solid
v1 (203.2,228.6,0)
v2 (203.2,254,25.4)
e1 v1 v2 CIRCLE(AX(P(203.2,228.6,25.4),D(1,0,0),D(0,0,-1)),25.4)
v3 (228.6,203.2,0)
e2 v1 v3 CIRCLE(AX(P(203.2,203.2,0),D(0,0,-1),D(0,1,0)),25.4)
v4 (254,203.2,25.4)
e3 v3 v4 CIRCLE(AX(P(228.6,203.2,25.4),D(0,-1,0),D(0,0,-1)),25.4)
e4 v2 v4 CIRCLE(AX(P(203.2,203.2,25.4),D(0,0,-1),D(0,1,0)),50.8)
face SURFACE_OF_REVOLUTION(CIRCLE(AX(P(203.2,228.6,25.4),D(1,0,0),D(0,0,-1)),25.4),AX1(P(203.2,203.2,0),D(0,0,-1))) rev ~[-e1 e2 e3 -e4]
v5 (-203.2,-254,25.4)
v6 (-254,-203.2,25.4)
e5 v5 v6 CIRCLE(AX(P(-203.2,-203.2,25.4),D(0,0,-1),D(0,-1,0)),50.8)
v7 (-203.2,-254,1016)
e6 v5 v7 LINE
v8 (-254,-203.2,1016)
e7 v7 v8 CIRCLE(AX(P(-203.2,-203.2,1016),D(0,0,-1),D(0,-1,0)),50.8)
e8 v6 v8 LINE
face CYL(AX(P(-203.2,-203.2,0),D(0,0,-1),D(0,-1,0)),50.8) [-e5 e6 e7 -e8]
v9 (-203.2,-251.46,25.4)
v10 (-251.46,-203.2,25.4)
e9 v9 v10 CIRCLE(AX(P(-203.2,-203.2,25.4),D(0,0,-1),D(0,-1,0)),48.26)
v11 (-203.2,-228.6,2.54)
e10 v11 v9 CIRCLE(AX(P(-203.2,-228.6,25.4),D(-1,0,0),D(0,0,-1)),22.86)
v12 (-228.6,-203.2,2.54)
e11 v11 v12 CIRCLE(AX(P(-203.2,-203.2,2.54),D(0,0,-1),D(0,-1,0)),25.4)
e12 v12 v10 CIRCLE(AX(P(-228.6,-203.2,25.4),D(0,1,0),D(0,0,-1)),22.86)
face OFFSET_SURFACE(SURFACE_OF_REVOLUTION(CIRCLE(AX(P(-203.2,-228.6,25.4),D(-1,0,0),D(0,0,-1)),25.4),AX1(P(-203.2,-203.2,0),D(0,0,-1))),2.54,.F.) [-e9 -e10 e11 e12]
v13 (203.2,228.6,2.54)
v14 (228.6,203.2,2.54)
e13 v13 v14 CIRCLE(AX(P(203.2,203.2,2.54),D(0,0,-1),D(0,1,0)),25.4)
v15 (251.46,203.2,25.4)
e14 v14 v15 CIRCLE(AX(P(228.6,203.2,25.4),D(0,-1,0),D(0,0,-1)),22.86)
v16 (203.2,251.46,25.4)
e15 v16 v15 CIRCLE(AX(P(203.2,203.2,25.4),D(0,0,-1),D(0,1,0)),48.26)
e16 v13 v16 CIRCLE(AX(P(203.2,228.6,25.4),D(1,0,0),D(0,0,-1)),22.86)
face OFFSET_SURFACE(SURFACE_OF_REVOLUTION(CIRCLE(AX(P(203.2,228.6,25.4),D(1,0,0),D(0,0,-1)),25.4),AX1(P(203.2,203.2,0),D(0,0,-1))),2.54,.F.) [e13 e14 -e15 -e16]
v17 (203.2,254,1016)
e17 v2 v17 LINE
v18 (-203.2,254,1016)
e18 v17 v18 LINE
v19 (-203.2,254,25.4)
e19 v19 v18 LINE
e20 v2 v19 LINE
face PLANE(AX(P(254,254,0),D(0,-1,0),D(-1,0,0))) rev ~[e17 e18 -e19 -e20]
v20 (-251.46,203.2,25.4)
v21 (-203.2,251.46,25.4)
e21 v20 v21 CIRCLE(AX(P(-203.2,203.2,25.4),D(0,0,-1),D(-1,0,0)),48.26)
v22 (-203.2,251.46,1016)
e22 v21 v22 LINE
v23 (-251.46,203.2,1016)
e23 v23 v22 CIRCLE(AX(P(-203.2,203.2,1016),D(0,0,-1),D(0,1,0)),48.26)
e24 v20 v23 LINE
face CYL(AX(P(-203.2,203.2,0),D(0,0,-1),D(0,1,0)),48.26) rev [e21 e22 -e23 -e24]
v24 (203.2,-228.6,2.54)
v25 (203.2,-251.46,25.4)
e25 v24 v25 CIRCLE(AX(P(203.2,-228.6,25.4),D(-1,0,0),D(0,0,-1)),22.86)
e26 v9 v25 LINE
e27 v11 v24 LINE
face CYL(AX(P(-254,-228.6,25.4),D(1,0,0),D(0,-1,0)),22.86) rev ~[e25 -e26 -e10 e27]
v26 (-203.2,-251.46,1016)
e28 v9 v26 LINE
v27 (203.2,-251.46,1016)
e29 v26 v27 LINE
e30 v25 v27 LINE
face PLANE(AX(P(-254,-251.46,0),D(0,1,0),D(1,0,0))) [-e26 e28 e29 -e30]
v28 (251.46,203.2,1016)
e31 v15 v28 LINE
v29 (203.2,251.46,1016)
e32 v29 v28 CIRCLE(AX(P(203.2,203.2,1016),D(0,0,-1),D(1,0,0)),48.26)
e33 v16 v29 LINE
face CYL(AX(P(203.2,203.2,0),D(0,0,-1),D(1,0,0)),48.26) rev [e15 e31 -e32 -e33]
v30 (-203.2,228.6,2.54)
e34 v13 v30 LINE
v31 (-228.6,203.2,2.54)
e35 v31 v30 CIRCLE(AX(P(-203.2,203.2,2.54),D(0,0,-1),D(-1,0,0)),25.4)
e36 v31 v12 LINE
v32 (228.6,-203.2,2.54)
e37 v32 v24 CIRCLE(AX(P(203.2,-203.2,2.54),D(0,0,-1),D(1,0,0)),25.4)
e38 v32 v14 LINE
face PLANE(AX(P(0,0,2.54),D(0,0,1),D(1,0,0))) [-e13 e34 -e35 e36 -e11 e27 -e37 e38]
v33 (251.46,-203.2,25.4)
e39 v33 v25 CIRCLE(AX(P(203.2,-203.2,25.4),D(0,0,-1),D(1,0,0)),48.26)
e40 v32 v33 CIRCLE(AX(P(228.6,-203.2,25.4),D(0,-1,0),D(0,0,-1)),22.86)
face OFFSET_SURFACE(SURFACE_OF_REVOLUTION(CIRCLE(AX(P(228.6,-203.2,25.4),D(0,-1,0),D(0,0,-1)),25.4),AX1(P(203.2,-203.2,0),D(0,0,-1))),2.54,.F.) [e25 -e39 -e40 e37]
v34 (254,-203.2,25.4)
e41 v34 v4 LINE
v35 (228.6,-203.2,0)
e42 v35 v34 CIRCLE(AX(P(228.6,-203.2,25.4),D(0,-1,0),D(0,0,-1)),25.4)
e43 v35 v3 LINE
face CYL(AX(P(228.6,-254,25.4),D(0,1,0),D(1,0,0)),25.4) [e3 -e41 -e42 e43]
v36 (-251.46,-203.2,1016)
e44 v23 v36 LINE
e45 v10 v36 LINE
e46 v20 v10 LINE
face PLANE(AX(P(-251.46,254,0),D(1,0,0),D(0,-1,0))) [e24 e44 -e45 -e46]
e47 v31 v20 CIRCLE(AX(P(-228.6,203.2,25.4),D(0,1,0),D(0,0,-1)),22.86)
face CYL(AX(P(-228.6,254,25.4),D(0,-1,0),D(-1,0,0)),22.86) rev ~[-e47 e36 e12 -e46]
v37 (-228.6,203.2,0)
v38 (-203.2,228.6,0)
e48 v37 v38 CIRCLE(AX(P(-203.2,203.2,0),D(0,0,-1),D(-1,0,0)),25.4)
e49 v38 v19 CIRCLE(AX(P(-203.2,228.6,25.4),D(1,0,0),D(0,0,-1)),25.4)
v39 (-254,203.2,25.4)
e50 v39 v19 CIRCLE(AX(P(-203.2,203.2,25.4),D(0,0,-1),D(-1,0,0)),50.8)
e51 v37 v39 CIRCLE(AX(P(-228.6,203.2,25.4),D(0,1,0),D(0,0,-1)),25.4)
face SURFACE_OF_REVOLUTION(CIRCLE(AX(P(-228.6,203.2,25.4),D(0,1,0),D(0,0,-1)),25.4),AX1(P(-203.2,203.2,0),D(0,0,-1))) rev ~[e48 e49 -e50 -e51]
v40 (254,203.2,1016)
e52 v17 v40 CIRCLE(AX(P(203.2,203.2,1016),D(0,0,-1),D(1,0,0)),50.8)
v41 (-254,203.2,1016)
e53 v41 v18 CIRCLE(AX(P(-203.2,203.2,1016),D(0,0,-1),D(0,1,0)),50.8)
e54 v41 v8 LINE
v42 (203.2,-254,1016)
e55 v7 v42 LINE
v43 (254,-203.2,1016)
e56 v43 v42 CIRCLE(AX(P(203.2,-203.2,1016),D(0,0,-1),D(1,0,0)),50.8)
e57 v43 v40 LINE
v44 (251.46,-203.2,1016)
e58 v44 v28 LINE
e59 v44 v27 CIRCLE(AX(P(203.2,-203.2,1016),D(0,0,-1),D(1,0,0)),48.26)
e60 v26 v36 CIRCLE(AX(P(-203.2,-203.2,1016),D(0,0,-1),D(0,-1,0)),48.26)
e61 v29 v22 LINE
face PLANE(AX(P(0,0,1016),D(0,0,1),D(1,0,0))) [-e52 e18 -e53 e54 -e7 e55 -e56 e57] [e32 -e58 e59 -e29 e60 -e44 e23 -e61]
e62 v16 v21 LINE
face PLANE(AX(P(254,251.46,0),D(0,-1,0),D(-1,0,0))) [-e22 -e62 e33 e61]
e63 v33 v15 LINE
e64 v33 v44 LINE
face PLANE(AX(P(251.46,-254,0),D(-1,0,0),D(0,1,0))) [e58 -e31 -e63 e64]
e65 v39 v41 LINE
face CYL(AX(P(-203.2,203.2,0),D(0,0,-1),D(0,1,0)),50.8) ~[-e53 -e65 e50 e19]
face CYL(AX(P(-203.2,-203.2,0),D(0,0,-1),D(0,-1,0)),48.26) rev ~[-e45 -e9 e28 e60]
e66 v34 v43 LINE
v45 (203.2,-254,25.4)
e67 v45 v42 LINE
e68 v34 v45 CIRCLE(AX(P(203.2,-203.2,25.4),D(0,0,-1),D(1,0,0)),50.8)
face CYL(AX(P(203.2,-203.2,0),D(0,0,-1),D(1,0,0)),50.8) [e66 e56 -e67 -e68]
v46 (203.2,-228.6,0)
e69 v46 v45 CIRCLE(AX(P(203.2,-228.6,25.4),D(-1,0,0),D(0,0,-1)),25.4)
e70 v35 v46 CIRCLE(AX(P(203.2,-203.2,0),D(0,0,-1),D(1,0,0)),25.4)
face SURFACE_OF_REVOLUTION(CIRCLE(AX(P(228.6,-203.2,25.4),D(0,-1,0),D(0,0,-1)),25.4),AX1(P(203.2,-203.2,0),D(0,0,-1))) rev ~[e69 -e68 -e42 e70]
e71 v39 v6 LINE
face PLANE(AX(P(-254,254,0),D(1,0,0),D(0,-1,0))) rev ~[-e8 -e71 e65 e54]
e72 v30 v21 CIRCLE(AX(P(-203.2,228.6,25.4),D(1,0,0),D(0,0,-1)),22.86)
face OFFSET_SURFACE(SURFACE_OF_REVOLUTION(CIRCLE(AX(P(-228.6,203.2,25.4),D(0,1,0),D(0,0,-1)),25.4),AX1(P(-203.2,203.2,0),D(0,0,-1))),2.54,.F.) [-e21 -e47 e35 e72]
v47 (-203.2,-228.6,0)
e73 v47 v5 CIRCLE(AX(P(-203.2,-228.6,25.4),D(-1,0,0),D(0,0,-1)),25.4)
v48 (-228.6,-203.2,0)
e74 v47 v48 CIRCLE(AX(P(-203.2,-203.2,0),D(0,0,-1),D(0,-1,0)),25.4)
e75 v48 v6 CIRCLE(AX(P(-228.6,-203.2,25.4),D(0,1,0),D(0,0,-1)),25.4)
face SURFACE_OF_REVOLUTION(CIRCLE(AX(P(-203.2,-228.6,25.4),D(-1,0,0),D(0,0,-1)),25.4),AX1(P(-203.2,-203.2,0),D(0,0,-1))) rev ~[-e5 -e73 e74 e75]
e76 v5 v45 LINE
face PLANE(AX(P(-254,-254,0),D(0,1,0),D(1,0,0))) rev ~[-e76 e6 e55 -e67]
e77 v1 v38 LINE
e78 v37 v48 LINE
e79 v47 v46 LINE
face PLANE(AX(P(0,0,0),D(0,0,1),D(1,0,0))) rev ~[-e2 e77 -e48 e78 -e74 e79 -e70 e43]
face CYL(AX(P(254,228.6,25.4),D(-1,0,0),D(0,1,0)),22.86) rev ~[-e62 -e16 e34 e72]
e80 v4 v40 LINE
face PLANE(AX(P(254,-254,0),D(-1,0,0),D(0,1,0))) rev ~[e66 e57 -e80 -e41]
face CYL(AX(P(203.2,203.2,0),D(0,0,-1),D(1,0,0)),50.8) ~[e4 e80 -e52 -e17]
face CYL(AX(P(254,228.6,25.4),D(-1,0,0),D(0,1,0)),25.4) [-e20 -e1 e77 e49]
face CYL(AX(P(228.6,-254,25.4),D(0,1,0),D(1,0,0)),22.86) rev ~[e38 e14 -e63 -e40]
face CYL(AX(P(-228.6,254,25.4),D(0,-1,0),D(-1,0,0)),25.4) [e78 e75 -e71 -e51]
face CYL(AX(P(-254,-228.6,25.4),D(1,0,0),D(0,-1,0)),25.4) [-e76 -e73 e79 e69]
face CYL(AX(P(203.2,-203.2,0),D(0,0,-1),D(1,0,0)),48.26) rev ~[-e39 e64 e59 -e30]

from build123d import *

# Parameters (mm, degrees)
F1_DEPTH     = 1016
F2_R         = 25.4
F3_T1_DEPTH  = 1143
F3_T4_ANGLE  = 90
F3_T6_ANGLE  = 90
F3_T8_ANGLE  = 90
F3_T10_ANGLE = 90
F4_T         = -2.54


# Not quite as in the source:
# - a fillet or chamfer that OpenCascade refuses, or shapes differently, is made with other operations: its cross-section is extruded or revolved along the edge and cut away or added


with BuildPart() as f1:
    # F0 (on Top) → F1 (new body)
    with BuildSketch(Plane.XY):
        Polygon((254, -254), (254, 0), (254, 254), (-254, 254), (-254, -254), align=None)
    extrude(amount=F1_DEPTH)

    # F2
    f2_edges = [f1.edges().sort_by_distance(p)[0] for p in [
        (-254, 0, 0),
        (0, 254, 0),
        (0, -254, 0),
        (254, 0, 0),
    ]]
    fillet(f2_edges, radius=F2_R)

    # F3: fillet of radius 50.8 on 4 edges, made by hand

    # F3_s2 → F3_t1 (cut)
    with BuildSketch(Plane.XY):
        with BuildLine():
            ThreePointArc((-203.2, 254), (-239.1210244843, 239.1210244843), (-254, 203.2))
            Line((-254, 203.2), (-254, 254))
            Line((-254, 254), (-203.2, 254))
        make_face()
        with BuildLine():
            ThreePointArc((-203.2, -254), (-239.1210244843, -239.1210244843), (-254, -203.2))
            Line((-254, -203.2), (-254, -254))
            Line((-254, -254), (-203.2, -254))
        make_face()
        with BuildLine():
            ThreePointArc((254, 203.2), (239.1210244843, 239.1210244843), (203.2, 254))
            Line((203.2, 254), (254, 254))
            Line((254, 254), (254, 203.2))
        make_face()
        with BuildLine():
            ThreePointArc((254, -203.2), (239.1210244843, -239.1210244843), (203.2, -254))
            Line((203.2, -254), (254, -254))
            Line((254, -254), (254, -203.2))
        make_face()
    extrude(amount=F3_T1_DEPTH, mode=Mode.SUBTRACT)

    # F3_s3 → F3_t4 (revolve, cut)
    with BuildSketch(Plane.XZ.offset(203.2)):
        with BuildLine():
            ThreePointArc((228.6, 0), (246.5605122421, 7.4394877579), (254, 25.4))
            Line((254, 25.4), (254, 0))
            Line((254, 0), (228.6, 0))
        make_face()
    revolve(axis=Axis((203.2, -203.2, 0), (0, 0, -1)), revolution_arc=F3_T4_ANGLE, mode=Mode.SUBTRACT)

    # F3_s5 → F3_t6 (revolve, cut)
    with BuildSketch(Plane.YZ.offset(203.2)):
        with BuildLine():
            ThreePointArc((228.6, 0), (246.5605122421, 7.4394877579), (254, 25.4))
            Line((254, 25.4), (254, 0))
            Line((254, 0), (228.6, 0))
        make_face()
    revolve(axis=Axis((203.2, 203.2, 0), (0, 0, -1)), revolution_arc=F3_T6_ANGLE, mode=Mode.SUBTRACT)

    # F3_s7 → F3_t8 (revolve, cut)
    with BuildSketch(Plane.YZ.offset(-203.2)):
        with BuildLine():
            ThreePointArc((-228.6, 0), (-246.5605122421, 7.4394877579), (-254, 25.4))
            Line((-254, 25.4), (-254, 0))
            Line((-254, 0), (-228.6, 0))
        make_face()
    revolve(axis=Axis((-203.2, -203.2, 0), (0, 0, -1)), revolution_arc=F3_T8_ANGLE, mode=Mode.SUBTRACT)

    # F3_s9 → F3_t10 (revolve, cut)
    with BuildSketch(Plane.XZ.offset(-203.2)):
        with BuildLine():
            ThreePointArc((-228.6, 0), (-246.5605122421, 7.4394877579), (-254, 25.4))
            Line((-254, 25.4), (-254, 0))
            Line((-254, 0), (-228.6, 0))
        make_face()
    revolve(axis=Axis((-203.2, 203.2, 0), (0, 0, -1)), revolution_arc=F3_T10_ANGLE, mode=Mode.SUBTRACT)

    # F4
    f4_openings = [f1.faces().sort_by_distance(p)[0] for p in [
        (0, 0, 1016),
    ]]
    offset(amount=F4_T, openings=f4_openings)


solid = f1.part
